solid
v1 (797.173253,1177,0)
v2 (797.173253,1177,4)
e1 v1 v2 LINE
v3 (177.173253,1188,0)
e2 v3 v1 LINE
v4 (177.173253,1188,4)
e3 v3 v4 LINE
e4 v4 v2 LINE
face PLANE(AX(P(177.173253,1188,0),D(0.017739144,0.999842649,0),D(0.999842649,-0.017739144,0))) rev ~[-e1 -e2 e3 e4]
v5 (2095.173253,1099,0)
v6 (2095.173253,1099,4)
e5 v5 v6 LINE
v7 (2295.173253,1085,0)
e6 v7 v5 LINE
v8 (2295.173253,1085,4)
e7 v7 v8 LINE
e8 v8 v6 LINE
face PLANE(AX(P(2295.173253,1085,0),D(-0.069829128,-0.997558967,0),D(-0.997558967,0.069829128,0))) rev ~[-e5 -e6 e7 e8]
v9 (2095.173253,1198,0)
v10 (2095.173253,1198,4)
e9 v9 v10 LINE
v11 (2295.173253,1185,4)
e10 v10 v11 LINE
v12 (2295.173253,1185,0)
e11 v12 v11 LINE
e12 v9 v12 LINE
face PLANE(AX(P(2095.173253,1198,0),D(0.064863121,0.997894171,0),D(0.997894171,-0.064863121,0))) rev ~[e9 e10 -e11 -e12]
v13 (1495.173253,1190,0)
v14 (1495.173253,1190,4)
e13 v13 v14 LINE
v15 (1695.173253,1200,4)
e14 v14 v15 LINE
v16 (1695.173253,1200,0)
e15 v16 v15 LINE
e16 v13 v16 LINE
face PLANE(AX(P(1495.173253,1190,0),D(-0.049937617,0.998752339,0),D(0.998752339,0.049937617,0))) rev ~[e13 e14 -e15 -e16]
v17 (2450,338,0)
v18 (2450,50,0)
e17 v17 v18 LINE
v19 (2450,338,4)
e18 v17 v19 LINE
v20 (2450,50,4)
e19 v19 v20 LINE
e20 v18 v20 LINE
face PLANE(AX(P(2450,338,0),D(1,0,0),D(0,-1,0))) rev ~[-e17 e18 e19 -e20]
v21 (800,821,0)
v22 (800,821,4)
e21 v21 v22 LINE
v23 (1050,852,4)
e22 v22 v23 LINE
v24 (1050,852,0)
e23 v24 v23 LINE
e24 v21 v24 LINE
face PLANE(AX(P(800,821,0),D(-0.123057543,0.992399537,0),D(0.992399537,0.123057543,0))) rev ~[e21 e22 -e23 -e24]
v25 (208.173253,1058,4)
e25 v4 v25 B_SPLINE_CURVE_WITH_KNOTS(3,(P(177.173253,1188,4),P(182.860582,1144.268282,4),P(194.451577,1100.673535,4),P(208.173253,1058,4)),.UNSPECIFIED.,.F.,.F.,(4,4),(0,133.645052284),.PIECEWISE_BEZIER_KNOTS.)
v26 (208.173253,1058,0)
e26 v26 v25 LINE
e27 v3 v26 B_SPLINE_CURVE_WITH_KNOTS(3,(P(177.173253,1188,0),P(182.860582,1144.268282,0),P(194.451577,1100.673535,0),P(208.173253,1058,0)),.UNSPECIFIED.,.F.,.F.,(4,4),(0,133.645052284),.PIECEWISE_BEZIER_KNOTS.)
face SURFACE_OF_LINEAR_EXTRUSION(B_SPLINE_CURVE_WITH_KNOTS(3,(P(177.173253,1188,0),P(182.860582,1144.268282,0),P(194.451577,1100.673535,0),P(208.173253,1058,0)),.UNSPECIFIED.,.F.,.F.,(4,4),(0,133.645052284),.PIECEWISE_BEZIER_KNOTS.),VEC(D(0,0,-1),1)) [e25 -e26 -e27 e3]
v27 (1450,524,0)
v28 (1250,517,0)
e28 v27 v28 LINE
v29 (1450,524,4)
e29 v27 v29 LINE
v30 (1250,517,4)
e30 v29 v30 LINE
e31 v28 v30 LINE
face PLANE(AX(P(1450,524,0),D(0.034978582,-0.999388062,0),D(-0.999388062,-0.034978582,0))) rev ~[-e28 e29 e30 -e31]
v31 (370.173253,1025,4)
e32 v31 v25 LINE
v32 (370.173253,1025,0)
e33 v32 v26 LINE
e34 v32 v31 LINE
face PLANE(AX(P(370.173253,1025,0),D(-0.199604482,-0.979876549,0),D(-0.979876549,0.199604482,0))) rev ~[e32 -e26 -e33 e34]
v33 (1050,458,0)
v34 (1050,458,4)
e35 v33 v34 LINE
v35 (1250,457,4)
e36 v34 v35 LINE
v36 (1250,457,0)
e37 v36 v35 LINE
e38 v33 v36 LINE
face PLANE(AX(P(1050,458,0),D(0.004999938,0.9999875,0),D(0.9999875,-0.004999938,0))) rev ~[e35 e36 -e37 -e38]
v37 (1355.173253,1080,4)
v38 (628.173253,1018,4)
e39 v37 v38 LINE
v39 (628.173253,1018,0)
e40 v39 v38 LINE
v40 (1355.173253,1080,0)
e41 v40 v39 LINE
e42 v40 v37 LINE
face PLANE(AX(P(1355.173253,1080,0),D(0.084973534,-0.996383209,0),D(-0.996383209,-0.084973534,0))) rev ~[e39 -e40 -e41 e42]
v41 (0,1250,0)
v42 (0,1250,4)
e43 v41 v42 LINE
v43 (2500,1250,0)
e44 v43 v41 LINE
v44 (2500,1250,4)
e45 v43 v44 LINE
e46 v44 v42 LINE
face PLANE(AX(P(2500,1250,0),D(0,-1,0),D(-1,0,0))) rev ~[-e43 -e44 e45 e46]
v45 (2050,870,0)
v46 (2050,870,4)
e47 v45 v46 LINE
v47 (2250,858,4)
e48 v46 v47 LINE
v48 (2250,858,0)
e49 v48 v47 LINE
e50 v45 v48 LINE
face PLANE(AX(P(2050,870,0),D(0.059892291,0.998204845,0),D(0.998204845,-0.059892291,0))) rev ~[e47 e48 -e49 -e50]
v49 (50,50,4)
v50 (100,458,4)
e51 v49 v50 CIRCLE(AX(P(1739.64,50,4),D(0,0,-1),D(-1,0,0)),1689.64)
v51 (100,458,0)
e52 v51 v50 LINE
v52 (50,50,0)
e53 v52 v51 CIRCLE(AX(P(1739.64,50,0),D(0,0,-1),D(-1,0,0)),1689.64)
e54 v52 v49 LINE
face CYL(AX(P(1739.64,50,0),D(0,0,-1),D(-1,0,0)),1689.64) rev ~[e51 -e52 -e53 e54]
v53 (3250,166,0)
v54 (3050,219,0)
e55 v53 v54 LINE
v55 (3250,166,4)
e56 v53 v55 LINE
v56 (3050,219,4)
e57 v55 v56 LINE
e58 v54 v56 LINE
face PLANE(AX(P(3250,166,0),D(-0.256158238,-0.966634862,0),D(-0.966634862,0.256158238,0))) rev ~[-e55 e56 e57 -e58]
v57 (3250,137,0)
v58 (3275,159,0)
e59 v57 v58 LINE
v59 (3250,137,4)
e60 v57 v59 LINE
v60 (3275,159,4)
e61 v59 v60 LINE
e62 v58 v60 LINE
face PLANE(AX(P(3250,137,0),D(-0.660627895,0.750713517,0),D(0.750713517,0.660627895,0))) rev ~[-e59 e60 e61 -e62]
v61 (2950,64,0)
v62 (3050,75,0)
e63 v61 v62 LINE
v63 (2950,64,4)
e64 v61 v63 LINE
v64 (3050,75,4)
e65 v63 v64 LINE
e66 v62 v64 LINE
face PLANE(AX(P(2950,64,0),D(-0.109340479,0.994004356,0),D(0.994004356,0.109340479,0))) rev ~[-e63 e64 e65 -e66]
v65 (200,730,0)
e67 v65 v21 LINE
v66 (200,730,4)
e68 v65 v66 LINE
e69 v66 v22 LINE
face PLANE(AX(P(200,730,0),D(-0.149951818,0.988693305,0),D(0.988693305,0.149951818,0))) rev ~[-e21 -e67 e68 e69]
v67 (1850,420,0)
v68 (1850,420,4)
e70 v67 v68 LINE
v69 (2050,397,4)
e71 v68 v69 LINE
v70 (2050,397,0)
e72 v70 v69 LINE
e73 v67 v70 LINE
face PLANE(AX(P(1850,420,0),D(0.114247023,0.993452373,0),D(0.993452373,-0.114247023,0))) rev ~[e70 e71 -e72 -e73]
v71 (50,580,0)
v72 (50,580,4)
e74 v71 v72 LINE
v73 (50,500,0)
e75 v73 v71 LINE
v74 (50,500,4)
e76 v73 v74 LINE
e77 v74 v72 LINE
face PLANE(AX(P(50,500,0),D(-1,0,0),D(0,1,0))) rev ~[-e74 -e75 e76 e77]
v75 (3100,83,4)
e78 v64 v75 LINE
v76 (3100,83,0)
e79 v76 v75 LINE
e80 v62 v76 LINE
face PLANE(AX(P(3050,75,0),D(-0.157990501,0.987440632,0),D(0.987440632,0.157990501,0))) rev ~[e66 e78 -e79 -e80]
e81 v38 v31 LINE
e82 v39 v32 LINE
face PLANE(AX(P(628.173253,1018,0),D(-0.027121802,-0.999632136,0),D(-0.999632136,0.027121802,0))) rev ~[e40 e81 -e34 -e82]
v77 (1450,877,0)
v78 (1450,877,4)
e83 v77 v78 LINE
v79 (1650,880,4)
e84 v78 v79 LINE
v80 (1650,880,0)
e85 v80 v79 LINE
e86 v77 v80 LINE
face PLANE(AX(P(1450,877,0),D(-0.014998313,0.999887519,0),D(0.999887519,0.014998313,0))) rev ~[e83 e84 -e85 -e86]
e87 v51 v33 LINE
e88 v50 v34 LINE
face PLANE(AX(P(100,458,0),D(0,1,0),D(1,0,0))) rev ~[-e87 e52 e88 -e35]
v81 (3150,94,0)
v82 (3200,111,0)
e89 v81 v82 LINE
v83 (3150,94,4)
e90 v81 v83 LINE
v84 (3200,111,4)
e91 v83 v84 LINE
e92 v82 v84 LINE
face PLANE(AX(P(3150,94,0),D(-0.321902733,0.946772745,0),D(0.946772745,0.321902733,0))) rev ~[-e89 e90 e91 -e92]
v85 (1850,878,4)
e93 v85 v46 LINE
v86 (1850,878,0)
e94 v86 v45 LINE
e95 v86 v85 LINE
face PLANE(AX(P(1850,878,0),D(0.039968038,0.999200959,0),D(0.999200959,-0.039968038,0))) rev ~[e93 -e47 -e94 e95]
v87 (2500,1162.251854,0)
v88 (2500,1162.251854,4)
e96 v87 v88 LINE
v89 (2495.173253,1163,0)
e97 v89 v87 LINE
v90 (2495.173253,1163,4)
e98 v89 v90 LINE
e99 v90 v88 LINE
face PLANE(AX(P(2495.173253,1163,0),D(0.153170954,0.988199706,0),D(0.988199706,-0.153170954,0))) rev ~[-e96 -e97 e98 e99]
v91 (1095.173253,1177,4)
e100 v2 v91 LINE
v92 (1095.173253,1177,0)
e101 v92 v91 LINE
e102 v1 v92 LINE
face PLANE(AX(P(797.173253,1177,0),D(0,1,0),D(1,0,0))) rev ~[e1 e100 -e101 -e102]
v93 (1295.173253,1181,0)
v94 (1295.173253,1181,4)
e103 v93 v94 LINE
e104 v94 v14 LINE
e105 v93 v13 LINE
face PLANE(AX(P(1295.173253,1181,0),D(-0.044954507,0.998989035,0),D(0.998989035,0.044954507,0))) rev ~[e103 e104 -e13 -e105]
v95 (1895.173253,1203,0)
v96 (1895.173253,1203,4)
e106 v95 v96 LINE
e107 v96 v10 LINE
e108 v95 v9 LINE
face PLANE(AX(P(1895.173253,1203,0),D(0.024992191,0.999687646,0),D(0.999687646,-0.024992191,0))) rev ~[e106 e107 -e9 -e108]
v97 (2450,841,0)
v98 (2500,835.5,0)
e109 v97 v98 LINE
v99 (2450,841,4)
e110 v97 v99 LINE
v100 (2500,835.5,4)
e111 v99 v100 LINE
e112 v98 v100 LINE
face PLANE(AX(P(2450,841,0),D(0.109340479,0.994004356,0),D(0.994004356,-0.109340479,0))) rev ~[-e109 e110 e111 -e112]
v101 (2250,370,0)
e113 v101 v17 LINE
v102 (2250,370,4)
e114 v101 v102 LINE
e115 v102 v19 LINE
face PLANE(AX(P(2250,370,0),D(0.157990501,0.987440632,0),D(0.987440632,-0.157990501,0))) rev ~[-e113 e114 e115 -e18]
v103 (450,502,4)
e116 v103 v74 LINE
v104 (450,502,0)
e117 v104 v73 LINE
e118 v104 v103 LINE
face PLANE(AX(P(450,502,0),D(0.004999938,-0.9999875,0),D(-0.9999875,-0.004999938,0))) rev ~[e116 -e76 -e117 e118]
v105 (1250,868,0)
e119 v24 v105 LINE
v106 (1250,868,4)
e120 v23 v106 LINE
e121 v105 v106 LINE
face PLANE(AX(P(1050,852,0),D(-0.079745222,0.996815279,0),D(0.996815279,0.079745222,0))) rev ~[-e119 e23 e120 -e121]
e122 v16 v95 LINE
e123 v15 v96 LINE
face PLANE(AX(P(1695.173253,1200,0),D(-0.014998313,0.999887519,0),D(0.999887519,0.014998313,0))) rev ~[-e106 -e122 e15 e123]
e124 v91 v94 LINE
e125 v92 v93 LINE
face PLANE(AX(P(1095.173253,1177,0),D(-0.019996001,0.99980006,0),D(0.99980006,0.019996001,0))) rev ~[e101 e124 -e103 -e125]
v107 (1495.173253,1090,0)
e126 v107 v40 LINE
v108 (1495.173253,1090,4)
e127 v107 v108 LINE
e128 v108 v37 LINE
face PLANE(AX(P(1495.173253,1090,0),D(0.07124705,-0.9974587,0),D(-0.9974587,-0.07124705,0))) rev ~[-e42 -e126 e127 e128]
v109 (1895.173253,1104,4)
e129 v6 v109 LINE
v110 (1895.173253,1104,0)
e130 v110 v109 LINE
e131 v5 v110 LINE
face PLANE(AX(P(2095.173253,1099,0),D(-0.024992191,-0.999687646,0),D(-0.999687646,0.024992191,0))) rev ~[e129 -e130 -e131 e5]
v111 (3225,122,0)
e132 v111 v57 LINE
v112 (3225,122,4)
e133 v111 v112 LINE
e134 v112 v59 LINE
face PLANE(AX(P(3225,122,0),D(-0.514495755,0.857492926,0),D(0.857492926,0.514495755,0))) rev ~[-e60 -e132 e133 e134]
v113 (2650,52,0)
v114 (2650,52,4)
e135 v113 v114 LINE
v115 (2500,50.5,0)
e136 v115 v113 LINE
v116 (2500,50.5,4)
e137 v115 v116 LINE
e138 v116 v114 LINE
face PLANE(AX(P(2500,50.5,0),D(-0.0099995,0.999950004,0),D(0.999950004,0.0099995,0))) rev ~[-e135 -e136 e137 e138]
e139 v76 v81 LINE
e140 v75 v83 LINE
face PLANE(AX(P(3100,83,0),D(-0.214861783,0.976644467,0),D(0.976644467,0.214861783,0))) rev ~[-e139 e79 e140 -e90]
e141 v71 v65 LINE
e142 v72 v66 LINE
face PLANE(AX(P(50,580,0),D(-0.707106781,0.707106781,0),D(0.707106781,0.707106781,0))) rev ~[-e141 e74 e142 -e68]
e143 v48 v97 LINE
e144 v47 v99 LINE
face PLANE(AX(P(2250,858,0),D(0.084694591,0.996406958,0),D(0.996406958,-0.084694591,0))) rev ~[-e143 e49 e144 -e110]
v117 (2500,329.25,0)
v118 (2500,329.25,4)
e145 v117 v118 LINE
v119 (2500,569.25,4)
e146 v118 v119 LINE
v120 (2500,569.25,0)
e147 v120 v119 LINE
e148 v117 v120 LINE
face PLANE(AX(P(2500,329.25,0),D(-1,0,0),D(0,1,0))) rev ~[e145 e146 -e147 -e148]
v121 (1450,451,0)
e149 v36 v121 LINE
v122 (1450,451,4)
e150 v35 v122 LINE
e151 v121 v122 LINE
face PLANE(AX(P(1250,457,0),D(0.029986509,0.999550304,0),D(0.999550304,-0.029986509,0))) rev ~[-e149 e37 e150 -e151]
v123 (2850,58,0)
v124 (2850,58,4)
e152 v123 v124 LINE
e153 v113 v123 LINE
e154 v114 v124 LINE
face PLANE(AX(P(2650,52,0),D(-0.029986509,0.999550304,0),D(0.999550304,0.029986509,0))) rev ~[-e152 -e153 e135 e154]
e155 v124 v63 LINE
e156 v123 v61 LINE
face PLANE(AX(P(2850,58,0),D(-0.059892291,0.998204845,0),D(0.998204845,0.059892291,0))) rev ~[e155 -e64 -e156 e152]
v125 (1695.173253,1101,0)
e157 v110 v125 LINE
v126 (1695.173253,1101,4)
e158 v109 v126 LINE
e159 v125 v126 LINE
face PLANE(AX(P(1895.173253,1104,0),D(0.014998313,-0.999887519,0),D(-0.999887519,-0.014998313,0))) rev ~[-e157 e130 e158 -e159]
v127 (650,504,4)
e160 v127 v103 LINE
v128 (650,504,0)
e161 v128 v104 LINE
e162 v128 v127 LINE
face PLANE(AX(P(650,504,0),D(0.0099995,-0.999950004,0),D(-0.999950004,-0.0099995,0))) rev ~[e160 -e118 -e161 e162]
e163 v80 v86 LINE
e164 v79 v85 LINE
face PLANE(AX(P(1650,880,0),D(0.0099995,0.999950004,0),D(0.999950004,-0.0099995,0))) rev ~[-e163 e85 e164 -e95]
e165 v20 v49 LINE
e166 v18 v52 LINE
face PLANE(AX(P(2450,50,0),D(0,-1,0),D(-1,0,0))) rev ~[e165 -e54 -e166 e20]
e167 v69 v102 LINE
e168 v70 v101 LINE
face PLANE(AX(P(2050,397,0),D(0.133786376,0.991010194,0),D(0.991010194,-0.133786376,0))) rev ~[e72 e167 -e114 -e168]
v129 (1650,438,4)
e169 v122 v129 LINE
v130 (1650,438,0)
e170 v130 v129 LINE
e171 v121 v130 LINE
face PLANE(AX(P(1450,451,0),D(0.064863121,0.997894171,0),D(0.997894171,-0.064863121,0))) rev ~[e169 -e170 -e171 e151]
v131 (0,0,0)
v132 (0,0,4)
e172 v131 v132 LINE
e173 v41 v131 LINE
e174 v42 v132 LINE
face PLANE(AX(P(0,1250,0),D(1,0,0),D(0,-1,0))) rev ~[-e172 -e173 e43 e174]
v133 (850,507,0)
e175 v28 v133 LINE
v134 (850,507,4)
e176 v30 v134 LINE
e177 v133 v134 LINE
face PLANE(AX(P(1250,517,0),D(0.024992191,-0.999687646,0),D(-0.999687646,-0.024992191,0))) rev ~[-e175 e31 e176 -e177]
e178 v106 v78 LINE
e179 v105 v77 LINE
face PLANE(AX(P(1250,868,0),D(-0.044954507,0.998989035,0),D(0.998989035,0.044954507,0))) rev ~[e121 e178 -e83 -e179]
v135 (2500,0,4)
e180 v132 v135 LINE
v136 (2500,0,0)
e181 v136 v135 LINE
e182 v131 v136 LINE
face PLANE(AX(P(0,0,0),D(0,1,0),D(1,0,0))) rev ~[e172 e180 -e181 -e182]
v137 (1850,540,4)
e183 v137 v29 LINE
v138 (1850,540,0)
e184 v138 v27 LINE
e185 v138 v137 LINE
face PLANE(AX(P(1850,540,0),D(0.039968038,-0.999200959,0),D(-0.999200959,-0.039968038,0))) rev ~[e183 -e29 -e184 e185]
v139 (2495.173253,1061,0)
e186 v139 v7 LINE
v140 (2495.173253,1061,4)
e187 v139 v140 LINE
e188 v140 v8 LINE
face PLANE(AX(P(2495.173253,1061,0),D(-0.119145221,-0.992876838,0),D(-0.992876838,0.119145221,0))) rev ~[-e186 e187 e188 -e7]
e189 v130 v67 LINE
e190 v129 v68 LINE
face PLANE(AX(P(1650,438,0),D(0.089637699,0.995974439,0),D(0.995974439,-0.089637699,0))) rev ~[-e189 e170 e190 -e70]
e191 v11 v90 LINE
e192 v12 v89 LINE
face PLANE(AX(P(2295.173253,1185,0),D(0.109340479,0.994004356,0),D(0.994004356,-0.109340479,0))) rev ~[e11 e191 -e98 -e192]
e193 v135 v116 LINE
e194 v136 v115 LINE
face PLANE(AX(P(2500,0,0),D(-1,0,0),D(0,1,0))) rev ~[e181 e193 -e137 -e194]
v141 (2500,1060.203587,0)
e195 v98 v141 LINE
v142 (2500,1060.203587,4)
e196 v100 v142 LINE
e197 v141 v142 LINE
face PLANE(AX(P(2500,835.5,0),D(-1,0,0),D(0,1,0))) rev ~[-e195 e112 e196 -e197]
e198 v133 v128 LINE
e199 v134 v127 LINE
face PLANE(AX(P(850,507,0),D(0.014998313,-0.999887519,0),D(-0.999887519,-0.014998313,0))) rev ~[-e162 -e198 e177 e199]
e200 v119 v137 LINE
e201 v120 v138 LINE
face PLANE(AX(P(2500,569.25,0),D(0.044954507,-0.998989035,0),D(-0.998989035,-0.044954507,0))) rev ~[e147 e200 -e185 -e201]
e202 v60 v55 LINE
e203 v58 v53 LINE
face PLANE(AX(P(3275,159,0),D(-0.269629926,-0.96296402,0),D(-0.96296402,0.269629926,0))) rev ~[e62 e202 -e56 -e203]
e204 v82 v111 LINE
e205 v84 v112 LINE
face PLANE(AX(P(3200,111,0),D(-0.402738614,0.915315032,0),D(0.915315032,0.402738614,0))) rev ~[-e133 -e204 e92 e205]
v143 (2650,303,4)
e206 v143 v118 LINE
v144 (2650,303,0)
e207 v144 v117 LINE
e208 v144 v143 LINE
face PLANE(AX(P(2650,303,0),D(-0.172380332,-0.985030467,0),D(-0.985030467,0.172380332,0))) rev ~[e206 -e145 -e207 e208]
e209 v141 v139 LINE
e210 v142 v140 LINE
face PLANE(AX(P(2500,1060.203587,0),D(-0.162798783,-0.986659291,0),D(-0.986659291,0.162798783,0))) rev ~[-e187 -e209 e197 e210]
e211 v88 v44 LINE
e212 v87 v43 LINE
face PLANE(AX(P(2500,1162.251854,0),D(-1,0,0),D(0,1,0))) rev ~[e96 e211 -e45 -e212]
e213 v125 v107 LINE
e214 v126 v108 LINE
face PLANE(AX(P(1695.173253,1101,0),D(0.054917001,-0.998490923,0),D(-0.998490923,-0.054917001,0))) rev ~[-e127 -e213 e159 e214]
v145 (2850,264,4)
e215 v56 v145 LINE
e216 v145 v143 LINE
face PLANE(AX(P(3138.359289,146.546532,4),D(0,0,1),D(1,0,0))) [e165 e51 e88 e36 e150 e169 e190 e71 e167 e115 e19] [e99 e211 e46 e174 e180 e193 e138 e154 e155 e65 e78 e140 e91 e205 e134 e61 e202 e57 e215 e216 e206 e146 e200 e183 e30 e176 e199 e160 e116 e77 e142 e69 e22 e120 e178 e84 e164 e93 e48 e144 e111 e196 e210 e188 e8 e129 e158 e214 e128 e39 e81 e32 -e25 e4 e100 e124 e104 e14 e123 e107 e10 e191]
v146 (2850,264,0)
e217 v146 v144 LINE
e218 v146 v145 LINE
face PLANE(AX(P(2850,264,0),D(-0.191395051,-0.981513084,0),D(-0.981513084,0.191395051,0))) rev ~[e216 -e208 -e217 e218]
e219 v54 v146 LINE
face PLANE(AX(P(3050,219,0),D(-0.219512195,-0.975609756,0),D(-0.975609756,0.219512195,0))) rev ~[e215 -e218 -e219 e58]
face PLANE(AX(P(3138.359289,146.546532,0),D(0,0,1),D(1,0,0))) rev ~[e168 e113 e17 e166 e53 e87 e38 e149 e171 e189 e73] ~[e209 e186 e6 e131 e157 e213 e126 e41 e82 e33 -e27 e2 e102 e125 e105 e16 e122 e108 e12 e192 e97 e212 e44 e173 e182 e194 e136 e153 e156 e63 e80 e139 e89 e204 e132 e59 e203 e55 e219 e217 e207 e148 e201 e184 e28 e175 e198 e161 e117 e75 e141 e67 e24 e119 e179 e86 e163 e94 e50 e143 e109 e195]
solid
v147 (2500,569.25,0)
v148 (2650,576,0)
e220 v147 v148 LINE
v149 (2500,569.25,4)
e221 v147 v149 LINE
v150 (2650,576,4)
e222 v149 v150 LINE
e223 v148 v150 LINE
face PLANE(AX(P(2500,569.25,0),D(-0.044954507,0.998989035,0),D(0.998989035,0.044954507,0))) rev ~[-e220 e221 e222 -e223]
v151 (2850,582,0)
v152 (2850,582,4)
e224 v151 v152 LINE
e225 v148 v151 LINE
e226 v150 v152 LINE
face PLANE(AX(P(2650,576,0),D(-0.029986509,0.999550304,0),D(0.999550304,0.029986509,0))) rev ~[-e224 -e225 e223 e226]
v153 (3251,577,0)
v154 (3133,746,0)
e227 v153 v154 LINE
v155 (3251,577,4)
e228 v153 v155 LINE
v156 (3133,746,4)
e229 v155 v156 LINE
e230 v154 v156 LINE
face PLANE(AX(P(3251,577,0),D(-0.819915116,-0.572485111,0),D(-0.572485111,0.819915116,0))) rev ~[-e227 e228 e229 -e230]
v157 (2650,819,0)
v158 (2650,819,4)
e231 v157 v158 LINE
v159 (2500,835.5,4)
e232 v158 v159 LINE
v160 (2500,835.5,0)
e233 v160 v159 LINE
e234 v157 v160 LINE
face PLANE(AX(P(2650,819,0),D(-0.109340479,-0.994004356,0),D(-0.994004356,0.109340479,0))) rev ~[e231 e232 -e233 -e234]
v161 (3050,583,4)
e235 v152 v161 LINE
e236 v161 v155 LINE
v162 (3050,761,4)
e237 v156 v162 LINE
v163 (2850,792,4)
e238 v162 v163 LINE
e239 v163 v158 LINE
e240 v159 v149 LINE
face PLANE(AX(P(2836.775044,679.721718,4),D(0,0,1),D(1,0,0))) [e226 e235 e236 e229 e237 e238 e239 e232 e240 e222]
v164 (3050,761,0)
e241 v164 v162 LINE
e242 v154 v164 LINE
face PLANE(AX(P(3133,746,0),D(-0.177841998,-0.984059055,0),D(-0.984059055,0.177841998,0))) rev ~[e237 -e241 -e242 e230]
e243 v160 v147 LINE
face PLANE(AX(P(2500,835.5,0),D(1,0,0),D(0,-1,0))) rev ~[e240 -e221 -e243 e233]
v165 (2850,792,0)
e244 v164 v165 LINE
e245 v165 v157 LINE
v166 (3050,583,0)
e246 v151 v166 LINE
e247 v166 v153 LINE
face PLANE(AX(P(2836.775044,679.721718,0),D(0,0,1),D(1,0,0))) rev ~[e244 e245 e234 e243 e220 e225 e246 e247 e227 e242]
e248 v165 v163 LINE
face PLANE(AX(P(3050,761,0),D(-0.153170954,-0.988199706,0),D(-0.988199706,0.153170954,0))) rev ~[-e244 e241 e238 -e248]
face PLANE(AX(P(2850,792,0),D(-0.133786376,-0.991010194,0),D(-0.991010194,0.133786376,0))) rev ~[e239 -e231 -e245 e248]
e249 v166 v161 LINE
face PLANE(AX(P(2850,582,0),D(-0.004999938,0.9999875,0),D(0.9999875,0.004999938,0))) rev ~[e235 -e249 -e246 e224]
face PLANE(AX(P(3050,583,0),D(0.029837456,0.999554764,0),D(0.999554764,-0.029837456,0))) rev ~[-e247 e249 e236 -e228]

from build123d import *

# Parameters (mm, degrees)
F1_DEPTH = 4


with BuildPart() as f1:
    # F0 (on Top) → F1 (new body)
    with BuildSketch(Plane.XY):
        Polygon((3250, 166), (3050, 219), (3050, 75), (3100, 83), (3150, 94), (3200, 111), (3225, 122), (3250, 137), (3275, 159), align=None)
        Polygon((2500, 329.25), (2500, 50.5), (2650, 52), (2650, 303), align=None)
        Polygon((2650, 303), (2650, 52), (2850, 58), (2850, 264), align=None)
        Polygon((2850, 264), (2850, 58), (2950, 64), (3050, 75), (3050, 219), align=None)
        Polygon((2450, 50), (2500, 50.5), (2500, 329.25), (2450, 338), align=None)
        with BuildLine():
            Line((0, 0), (2500, 0))
            Line((2500, 0), (2500, 50.5))
            Line((2500, 50.5), (2450, 50))
            Line((2450, 50), (2250, 50))
            Line((2250, 50), (2050, 50))
            Line((2050, 50), (1850, 50))
            Line((1850, 50), (1650, 50))
            Line((1650, 50), (1450, 50))
            Line((1450, 50), (1250, 50))
            Line((1250, 50), (1050, 50))
            Line((1050, 50), (50, 50))
            ThreePointArc((50, 50), (62.5465829239, 255.5261540534), (100, 458))
            Line((100, 458), (1050, 458))
            Line((1050, 458), (1250, 457))
            Line((1250, 457), (1450, 451))
            Line((1450, 451), (1650, 438))
            Line((1650, 438), (1850, 420))
            Line((1850, 420), (2050, 397))
            Line((2050, 397), (2250, 370))
            Line((2250, 370), (2450, 338))
            Line((2450, 338), (2500, 329.25))
            Line((2500, 329.25), (2500, 569.25))
            Line((2500, 569.25), (2450, 567))
            Line((2450, 567), (2250, 558))
            Line((2250, 558), (2050, 549))
            Line((2050, 549), (1850, 540))
            Line((1850, 540), (1650, 532))
            Line((1650, 532), (1450, 524))
            Line((1450, 524), (1250, 517))
            Line((1250, 517), (1050, 512))
            Line((1050, 512), (850, 507))
            Line((850, 507), (650, 504))
            Line((650, 504), (450, 502))
            Line((450, 502), (50, 500))
            Line((50, 500), (50, 580))
            Line((50, 580), (200, 730))
            Line((200, 730), (305.4945054945, 746))
            Line((305.4945054945, 746), (800, 821))
            Line((800, 821), (1050, 852))
            Line((1050, 852), (1250, 868))
            Line((1250, 868), (1450, 877))
            Line((1450, 877), (1650, 880))
            Line((1650, 880), (1850, 878))
            Line((1850, 878), (2050, 870))
            Line((2050, 870), (2250, 858))
            Line((2250, 858), (2450, 841))
            Line((2450, 841), (2500, 835.5))
            Line((2500, 835.5), (2500, 1060.2035867911))
            Line((2500, 1060.2035867911), (2495.1732532795, 1061))
            Line((2495.1732532795, 1061), (2295.1732532795, 1085))
            Line((2295.1732532795, 1085), (2095.1732532795, 1099))
            Line((2095.1732532795, 1099), (1895.1732532795, 1104))
            Line((1895.1732532795, 1104), (1695.1732532795, 1101))
            Line((1695.1732532795, 1101), (1495.1732532795, 1090))
            Line((1495.1732532795, 1090), (1355.1732532795, 1080))
            Line((1355.1732532795, 1080), (628.1732532795, 1018))
            Line((628.1732532795, 1018), (370.1732532795, 1025))
            Line((370.1732532795, 1025), (208.1732532795, 1058))
            add(Edge.make_bspline(
                [(177.1732532795, 1188), (182.8605817373, 1144.2682824135), (194.4515766318, 1100.6735346317), (208.1732532795, 1058)],
                knots=[0, 0, 0, 0, 133.645052284, 133.645052284, 133.645052284, 133.645052284], degree=3))
            Line((177.1732532795, 1188), (797.1732532795, 1177))
            Line((797.1732532795, 1177), (1095.1732532795, 1177))
            Line((1095.1732532795, 1177), (1295.1732532795, 1181))
            Line((1295.1732532795, 1181), (1495.1732532795, 1190))
            Line((1495.1732532795, 1190), (1695.1732532795, 1200))
            Line((1695.1732532795, 1200), (1895.1732532795, 1203))
            Line((1895.1732532795, 1203), (2095.1732532795, 1198))
            Line((2095.1732532795, 1198), (2295.1732532795, 1185))
            Line((2295.1732532795, 1185), (2495.1732532795, 1163))
            Line((2495.1732532795, 1163), (2500, 1162.2518542583))
            Line((2500, 1162.2518542583), (2500, 1250))
            Line((2500, 1250), (0, 1250))
            Line((0, 1250), (0, 0))
        make_face()
    extrude(amount=F1_DEPTH)


with BuildPart() as f1b:
    # F0 (on Top) → F1, piece 2 (new body)
    with BuildSketch(Plane.XY):
        Polygon((2500, 835.5), (2500, 569.25), (2650, 576), (2850, 582), (3050, 583), (3251, 577), (3133, 746), (3050, 761), (2850, 792), (2650, 819), align=None)
    extrude(amount=F1_DEPTH)


solid = Compound([f1.part, f1b.part])
